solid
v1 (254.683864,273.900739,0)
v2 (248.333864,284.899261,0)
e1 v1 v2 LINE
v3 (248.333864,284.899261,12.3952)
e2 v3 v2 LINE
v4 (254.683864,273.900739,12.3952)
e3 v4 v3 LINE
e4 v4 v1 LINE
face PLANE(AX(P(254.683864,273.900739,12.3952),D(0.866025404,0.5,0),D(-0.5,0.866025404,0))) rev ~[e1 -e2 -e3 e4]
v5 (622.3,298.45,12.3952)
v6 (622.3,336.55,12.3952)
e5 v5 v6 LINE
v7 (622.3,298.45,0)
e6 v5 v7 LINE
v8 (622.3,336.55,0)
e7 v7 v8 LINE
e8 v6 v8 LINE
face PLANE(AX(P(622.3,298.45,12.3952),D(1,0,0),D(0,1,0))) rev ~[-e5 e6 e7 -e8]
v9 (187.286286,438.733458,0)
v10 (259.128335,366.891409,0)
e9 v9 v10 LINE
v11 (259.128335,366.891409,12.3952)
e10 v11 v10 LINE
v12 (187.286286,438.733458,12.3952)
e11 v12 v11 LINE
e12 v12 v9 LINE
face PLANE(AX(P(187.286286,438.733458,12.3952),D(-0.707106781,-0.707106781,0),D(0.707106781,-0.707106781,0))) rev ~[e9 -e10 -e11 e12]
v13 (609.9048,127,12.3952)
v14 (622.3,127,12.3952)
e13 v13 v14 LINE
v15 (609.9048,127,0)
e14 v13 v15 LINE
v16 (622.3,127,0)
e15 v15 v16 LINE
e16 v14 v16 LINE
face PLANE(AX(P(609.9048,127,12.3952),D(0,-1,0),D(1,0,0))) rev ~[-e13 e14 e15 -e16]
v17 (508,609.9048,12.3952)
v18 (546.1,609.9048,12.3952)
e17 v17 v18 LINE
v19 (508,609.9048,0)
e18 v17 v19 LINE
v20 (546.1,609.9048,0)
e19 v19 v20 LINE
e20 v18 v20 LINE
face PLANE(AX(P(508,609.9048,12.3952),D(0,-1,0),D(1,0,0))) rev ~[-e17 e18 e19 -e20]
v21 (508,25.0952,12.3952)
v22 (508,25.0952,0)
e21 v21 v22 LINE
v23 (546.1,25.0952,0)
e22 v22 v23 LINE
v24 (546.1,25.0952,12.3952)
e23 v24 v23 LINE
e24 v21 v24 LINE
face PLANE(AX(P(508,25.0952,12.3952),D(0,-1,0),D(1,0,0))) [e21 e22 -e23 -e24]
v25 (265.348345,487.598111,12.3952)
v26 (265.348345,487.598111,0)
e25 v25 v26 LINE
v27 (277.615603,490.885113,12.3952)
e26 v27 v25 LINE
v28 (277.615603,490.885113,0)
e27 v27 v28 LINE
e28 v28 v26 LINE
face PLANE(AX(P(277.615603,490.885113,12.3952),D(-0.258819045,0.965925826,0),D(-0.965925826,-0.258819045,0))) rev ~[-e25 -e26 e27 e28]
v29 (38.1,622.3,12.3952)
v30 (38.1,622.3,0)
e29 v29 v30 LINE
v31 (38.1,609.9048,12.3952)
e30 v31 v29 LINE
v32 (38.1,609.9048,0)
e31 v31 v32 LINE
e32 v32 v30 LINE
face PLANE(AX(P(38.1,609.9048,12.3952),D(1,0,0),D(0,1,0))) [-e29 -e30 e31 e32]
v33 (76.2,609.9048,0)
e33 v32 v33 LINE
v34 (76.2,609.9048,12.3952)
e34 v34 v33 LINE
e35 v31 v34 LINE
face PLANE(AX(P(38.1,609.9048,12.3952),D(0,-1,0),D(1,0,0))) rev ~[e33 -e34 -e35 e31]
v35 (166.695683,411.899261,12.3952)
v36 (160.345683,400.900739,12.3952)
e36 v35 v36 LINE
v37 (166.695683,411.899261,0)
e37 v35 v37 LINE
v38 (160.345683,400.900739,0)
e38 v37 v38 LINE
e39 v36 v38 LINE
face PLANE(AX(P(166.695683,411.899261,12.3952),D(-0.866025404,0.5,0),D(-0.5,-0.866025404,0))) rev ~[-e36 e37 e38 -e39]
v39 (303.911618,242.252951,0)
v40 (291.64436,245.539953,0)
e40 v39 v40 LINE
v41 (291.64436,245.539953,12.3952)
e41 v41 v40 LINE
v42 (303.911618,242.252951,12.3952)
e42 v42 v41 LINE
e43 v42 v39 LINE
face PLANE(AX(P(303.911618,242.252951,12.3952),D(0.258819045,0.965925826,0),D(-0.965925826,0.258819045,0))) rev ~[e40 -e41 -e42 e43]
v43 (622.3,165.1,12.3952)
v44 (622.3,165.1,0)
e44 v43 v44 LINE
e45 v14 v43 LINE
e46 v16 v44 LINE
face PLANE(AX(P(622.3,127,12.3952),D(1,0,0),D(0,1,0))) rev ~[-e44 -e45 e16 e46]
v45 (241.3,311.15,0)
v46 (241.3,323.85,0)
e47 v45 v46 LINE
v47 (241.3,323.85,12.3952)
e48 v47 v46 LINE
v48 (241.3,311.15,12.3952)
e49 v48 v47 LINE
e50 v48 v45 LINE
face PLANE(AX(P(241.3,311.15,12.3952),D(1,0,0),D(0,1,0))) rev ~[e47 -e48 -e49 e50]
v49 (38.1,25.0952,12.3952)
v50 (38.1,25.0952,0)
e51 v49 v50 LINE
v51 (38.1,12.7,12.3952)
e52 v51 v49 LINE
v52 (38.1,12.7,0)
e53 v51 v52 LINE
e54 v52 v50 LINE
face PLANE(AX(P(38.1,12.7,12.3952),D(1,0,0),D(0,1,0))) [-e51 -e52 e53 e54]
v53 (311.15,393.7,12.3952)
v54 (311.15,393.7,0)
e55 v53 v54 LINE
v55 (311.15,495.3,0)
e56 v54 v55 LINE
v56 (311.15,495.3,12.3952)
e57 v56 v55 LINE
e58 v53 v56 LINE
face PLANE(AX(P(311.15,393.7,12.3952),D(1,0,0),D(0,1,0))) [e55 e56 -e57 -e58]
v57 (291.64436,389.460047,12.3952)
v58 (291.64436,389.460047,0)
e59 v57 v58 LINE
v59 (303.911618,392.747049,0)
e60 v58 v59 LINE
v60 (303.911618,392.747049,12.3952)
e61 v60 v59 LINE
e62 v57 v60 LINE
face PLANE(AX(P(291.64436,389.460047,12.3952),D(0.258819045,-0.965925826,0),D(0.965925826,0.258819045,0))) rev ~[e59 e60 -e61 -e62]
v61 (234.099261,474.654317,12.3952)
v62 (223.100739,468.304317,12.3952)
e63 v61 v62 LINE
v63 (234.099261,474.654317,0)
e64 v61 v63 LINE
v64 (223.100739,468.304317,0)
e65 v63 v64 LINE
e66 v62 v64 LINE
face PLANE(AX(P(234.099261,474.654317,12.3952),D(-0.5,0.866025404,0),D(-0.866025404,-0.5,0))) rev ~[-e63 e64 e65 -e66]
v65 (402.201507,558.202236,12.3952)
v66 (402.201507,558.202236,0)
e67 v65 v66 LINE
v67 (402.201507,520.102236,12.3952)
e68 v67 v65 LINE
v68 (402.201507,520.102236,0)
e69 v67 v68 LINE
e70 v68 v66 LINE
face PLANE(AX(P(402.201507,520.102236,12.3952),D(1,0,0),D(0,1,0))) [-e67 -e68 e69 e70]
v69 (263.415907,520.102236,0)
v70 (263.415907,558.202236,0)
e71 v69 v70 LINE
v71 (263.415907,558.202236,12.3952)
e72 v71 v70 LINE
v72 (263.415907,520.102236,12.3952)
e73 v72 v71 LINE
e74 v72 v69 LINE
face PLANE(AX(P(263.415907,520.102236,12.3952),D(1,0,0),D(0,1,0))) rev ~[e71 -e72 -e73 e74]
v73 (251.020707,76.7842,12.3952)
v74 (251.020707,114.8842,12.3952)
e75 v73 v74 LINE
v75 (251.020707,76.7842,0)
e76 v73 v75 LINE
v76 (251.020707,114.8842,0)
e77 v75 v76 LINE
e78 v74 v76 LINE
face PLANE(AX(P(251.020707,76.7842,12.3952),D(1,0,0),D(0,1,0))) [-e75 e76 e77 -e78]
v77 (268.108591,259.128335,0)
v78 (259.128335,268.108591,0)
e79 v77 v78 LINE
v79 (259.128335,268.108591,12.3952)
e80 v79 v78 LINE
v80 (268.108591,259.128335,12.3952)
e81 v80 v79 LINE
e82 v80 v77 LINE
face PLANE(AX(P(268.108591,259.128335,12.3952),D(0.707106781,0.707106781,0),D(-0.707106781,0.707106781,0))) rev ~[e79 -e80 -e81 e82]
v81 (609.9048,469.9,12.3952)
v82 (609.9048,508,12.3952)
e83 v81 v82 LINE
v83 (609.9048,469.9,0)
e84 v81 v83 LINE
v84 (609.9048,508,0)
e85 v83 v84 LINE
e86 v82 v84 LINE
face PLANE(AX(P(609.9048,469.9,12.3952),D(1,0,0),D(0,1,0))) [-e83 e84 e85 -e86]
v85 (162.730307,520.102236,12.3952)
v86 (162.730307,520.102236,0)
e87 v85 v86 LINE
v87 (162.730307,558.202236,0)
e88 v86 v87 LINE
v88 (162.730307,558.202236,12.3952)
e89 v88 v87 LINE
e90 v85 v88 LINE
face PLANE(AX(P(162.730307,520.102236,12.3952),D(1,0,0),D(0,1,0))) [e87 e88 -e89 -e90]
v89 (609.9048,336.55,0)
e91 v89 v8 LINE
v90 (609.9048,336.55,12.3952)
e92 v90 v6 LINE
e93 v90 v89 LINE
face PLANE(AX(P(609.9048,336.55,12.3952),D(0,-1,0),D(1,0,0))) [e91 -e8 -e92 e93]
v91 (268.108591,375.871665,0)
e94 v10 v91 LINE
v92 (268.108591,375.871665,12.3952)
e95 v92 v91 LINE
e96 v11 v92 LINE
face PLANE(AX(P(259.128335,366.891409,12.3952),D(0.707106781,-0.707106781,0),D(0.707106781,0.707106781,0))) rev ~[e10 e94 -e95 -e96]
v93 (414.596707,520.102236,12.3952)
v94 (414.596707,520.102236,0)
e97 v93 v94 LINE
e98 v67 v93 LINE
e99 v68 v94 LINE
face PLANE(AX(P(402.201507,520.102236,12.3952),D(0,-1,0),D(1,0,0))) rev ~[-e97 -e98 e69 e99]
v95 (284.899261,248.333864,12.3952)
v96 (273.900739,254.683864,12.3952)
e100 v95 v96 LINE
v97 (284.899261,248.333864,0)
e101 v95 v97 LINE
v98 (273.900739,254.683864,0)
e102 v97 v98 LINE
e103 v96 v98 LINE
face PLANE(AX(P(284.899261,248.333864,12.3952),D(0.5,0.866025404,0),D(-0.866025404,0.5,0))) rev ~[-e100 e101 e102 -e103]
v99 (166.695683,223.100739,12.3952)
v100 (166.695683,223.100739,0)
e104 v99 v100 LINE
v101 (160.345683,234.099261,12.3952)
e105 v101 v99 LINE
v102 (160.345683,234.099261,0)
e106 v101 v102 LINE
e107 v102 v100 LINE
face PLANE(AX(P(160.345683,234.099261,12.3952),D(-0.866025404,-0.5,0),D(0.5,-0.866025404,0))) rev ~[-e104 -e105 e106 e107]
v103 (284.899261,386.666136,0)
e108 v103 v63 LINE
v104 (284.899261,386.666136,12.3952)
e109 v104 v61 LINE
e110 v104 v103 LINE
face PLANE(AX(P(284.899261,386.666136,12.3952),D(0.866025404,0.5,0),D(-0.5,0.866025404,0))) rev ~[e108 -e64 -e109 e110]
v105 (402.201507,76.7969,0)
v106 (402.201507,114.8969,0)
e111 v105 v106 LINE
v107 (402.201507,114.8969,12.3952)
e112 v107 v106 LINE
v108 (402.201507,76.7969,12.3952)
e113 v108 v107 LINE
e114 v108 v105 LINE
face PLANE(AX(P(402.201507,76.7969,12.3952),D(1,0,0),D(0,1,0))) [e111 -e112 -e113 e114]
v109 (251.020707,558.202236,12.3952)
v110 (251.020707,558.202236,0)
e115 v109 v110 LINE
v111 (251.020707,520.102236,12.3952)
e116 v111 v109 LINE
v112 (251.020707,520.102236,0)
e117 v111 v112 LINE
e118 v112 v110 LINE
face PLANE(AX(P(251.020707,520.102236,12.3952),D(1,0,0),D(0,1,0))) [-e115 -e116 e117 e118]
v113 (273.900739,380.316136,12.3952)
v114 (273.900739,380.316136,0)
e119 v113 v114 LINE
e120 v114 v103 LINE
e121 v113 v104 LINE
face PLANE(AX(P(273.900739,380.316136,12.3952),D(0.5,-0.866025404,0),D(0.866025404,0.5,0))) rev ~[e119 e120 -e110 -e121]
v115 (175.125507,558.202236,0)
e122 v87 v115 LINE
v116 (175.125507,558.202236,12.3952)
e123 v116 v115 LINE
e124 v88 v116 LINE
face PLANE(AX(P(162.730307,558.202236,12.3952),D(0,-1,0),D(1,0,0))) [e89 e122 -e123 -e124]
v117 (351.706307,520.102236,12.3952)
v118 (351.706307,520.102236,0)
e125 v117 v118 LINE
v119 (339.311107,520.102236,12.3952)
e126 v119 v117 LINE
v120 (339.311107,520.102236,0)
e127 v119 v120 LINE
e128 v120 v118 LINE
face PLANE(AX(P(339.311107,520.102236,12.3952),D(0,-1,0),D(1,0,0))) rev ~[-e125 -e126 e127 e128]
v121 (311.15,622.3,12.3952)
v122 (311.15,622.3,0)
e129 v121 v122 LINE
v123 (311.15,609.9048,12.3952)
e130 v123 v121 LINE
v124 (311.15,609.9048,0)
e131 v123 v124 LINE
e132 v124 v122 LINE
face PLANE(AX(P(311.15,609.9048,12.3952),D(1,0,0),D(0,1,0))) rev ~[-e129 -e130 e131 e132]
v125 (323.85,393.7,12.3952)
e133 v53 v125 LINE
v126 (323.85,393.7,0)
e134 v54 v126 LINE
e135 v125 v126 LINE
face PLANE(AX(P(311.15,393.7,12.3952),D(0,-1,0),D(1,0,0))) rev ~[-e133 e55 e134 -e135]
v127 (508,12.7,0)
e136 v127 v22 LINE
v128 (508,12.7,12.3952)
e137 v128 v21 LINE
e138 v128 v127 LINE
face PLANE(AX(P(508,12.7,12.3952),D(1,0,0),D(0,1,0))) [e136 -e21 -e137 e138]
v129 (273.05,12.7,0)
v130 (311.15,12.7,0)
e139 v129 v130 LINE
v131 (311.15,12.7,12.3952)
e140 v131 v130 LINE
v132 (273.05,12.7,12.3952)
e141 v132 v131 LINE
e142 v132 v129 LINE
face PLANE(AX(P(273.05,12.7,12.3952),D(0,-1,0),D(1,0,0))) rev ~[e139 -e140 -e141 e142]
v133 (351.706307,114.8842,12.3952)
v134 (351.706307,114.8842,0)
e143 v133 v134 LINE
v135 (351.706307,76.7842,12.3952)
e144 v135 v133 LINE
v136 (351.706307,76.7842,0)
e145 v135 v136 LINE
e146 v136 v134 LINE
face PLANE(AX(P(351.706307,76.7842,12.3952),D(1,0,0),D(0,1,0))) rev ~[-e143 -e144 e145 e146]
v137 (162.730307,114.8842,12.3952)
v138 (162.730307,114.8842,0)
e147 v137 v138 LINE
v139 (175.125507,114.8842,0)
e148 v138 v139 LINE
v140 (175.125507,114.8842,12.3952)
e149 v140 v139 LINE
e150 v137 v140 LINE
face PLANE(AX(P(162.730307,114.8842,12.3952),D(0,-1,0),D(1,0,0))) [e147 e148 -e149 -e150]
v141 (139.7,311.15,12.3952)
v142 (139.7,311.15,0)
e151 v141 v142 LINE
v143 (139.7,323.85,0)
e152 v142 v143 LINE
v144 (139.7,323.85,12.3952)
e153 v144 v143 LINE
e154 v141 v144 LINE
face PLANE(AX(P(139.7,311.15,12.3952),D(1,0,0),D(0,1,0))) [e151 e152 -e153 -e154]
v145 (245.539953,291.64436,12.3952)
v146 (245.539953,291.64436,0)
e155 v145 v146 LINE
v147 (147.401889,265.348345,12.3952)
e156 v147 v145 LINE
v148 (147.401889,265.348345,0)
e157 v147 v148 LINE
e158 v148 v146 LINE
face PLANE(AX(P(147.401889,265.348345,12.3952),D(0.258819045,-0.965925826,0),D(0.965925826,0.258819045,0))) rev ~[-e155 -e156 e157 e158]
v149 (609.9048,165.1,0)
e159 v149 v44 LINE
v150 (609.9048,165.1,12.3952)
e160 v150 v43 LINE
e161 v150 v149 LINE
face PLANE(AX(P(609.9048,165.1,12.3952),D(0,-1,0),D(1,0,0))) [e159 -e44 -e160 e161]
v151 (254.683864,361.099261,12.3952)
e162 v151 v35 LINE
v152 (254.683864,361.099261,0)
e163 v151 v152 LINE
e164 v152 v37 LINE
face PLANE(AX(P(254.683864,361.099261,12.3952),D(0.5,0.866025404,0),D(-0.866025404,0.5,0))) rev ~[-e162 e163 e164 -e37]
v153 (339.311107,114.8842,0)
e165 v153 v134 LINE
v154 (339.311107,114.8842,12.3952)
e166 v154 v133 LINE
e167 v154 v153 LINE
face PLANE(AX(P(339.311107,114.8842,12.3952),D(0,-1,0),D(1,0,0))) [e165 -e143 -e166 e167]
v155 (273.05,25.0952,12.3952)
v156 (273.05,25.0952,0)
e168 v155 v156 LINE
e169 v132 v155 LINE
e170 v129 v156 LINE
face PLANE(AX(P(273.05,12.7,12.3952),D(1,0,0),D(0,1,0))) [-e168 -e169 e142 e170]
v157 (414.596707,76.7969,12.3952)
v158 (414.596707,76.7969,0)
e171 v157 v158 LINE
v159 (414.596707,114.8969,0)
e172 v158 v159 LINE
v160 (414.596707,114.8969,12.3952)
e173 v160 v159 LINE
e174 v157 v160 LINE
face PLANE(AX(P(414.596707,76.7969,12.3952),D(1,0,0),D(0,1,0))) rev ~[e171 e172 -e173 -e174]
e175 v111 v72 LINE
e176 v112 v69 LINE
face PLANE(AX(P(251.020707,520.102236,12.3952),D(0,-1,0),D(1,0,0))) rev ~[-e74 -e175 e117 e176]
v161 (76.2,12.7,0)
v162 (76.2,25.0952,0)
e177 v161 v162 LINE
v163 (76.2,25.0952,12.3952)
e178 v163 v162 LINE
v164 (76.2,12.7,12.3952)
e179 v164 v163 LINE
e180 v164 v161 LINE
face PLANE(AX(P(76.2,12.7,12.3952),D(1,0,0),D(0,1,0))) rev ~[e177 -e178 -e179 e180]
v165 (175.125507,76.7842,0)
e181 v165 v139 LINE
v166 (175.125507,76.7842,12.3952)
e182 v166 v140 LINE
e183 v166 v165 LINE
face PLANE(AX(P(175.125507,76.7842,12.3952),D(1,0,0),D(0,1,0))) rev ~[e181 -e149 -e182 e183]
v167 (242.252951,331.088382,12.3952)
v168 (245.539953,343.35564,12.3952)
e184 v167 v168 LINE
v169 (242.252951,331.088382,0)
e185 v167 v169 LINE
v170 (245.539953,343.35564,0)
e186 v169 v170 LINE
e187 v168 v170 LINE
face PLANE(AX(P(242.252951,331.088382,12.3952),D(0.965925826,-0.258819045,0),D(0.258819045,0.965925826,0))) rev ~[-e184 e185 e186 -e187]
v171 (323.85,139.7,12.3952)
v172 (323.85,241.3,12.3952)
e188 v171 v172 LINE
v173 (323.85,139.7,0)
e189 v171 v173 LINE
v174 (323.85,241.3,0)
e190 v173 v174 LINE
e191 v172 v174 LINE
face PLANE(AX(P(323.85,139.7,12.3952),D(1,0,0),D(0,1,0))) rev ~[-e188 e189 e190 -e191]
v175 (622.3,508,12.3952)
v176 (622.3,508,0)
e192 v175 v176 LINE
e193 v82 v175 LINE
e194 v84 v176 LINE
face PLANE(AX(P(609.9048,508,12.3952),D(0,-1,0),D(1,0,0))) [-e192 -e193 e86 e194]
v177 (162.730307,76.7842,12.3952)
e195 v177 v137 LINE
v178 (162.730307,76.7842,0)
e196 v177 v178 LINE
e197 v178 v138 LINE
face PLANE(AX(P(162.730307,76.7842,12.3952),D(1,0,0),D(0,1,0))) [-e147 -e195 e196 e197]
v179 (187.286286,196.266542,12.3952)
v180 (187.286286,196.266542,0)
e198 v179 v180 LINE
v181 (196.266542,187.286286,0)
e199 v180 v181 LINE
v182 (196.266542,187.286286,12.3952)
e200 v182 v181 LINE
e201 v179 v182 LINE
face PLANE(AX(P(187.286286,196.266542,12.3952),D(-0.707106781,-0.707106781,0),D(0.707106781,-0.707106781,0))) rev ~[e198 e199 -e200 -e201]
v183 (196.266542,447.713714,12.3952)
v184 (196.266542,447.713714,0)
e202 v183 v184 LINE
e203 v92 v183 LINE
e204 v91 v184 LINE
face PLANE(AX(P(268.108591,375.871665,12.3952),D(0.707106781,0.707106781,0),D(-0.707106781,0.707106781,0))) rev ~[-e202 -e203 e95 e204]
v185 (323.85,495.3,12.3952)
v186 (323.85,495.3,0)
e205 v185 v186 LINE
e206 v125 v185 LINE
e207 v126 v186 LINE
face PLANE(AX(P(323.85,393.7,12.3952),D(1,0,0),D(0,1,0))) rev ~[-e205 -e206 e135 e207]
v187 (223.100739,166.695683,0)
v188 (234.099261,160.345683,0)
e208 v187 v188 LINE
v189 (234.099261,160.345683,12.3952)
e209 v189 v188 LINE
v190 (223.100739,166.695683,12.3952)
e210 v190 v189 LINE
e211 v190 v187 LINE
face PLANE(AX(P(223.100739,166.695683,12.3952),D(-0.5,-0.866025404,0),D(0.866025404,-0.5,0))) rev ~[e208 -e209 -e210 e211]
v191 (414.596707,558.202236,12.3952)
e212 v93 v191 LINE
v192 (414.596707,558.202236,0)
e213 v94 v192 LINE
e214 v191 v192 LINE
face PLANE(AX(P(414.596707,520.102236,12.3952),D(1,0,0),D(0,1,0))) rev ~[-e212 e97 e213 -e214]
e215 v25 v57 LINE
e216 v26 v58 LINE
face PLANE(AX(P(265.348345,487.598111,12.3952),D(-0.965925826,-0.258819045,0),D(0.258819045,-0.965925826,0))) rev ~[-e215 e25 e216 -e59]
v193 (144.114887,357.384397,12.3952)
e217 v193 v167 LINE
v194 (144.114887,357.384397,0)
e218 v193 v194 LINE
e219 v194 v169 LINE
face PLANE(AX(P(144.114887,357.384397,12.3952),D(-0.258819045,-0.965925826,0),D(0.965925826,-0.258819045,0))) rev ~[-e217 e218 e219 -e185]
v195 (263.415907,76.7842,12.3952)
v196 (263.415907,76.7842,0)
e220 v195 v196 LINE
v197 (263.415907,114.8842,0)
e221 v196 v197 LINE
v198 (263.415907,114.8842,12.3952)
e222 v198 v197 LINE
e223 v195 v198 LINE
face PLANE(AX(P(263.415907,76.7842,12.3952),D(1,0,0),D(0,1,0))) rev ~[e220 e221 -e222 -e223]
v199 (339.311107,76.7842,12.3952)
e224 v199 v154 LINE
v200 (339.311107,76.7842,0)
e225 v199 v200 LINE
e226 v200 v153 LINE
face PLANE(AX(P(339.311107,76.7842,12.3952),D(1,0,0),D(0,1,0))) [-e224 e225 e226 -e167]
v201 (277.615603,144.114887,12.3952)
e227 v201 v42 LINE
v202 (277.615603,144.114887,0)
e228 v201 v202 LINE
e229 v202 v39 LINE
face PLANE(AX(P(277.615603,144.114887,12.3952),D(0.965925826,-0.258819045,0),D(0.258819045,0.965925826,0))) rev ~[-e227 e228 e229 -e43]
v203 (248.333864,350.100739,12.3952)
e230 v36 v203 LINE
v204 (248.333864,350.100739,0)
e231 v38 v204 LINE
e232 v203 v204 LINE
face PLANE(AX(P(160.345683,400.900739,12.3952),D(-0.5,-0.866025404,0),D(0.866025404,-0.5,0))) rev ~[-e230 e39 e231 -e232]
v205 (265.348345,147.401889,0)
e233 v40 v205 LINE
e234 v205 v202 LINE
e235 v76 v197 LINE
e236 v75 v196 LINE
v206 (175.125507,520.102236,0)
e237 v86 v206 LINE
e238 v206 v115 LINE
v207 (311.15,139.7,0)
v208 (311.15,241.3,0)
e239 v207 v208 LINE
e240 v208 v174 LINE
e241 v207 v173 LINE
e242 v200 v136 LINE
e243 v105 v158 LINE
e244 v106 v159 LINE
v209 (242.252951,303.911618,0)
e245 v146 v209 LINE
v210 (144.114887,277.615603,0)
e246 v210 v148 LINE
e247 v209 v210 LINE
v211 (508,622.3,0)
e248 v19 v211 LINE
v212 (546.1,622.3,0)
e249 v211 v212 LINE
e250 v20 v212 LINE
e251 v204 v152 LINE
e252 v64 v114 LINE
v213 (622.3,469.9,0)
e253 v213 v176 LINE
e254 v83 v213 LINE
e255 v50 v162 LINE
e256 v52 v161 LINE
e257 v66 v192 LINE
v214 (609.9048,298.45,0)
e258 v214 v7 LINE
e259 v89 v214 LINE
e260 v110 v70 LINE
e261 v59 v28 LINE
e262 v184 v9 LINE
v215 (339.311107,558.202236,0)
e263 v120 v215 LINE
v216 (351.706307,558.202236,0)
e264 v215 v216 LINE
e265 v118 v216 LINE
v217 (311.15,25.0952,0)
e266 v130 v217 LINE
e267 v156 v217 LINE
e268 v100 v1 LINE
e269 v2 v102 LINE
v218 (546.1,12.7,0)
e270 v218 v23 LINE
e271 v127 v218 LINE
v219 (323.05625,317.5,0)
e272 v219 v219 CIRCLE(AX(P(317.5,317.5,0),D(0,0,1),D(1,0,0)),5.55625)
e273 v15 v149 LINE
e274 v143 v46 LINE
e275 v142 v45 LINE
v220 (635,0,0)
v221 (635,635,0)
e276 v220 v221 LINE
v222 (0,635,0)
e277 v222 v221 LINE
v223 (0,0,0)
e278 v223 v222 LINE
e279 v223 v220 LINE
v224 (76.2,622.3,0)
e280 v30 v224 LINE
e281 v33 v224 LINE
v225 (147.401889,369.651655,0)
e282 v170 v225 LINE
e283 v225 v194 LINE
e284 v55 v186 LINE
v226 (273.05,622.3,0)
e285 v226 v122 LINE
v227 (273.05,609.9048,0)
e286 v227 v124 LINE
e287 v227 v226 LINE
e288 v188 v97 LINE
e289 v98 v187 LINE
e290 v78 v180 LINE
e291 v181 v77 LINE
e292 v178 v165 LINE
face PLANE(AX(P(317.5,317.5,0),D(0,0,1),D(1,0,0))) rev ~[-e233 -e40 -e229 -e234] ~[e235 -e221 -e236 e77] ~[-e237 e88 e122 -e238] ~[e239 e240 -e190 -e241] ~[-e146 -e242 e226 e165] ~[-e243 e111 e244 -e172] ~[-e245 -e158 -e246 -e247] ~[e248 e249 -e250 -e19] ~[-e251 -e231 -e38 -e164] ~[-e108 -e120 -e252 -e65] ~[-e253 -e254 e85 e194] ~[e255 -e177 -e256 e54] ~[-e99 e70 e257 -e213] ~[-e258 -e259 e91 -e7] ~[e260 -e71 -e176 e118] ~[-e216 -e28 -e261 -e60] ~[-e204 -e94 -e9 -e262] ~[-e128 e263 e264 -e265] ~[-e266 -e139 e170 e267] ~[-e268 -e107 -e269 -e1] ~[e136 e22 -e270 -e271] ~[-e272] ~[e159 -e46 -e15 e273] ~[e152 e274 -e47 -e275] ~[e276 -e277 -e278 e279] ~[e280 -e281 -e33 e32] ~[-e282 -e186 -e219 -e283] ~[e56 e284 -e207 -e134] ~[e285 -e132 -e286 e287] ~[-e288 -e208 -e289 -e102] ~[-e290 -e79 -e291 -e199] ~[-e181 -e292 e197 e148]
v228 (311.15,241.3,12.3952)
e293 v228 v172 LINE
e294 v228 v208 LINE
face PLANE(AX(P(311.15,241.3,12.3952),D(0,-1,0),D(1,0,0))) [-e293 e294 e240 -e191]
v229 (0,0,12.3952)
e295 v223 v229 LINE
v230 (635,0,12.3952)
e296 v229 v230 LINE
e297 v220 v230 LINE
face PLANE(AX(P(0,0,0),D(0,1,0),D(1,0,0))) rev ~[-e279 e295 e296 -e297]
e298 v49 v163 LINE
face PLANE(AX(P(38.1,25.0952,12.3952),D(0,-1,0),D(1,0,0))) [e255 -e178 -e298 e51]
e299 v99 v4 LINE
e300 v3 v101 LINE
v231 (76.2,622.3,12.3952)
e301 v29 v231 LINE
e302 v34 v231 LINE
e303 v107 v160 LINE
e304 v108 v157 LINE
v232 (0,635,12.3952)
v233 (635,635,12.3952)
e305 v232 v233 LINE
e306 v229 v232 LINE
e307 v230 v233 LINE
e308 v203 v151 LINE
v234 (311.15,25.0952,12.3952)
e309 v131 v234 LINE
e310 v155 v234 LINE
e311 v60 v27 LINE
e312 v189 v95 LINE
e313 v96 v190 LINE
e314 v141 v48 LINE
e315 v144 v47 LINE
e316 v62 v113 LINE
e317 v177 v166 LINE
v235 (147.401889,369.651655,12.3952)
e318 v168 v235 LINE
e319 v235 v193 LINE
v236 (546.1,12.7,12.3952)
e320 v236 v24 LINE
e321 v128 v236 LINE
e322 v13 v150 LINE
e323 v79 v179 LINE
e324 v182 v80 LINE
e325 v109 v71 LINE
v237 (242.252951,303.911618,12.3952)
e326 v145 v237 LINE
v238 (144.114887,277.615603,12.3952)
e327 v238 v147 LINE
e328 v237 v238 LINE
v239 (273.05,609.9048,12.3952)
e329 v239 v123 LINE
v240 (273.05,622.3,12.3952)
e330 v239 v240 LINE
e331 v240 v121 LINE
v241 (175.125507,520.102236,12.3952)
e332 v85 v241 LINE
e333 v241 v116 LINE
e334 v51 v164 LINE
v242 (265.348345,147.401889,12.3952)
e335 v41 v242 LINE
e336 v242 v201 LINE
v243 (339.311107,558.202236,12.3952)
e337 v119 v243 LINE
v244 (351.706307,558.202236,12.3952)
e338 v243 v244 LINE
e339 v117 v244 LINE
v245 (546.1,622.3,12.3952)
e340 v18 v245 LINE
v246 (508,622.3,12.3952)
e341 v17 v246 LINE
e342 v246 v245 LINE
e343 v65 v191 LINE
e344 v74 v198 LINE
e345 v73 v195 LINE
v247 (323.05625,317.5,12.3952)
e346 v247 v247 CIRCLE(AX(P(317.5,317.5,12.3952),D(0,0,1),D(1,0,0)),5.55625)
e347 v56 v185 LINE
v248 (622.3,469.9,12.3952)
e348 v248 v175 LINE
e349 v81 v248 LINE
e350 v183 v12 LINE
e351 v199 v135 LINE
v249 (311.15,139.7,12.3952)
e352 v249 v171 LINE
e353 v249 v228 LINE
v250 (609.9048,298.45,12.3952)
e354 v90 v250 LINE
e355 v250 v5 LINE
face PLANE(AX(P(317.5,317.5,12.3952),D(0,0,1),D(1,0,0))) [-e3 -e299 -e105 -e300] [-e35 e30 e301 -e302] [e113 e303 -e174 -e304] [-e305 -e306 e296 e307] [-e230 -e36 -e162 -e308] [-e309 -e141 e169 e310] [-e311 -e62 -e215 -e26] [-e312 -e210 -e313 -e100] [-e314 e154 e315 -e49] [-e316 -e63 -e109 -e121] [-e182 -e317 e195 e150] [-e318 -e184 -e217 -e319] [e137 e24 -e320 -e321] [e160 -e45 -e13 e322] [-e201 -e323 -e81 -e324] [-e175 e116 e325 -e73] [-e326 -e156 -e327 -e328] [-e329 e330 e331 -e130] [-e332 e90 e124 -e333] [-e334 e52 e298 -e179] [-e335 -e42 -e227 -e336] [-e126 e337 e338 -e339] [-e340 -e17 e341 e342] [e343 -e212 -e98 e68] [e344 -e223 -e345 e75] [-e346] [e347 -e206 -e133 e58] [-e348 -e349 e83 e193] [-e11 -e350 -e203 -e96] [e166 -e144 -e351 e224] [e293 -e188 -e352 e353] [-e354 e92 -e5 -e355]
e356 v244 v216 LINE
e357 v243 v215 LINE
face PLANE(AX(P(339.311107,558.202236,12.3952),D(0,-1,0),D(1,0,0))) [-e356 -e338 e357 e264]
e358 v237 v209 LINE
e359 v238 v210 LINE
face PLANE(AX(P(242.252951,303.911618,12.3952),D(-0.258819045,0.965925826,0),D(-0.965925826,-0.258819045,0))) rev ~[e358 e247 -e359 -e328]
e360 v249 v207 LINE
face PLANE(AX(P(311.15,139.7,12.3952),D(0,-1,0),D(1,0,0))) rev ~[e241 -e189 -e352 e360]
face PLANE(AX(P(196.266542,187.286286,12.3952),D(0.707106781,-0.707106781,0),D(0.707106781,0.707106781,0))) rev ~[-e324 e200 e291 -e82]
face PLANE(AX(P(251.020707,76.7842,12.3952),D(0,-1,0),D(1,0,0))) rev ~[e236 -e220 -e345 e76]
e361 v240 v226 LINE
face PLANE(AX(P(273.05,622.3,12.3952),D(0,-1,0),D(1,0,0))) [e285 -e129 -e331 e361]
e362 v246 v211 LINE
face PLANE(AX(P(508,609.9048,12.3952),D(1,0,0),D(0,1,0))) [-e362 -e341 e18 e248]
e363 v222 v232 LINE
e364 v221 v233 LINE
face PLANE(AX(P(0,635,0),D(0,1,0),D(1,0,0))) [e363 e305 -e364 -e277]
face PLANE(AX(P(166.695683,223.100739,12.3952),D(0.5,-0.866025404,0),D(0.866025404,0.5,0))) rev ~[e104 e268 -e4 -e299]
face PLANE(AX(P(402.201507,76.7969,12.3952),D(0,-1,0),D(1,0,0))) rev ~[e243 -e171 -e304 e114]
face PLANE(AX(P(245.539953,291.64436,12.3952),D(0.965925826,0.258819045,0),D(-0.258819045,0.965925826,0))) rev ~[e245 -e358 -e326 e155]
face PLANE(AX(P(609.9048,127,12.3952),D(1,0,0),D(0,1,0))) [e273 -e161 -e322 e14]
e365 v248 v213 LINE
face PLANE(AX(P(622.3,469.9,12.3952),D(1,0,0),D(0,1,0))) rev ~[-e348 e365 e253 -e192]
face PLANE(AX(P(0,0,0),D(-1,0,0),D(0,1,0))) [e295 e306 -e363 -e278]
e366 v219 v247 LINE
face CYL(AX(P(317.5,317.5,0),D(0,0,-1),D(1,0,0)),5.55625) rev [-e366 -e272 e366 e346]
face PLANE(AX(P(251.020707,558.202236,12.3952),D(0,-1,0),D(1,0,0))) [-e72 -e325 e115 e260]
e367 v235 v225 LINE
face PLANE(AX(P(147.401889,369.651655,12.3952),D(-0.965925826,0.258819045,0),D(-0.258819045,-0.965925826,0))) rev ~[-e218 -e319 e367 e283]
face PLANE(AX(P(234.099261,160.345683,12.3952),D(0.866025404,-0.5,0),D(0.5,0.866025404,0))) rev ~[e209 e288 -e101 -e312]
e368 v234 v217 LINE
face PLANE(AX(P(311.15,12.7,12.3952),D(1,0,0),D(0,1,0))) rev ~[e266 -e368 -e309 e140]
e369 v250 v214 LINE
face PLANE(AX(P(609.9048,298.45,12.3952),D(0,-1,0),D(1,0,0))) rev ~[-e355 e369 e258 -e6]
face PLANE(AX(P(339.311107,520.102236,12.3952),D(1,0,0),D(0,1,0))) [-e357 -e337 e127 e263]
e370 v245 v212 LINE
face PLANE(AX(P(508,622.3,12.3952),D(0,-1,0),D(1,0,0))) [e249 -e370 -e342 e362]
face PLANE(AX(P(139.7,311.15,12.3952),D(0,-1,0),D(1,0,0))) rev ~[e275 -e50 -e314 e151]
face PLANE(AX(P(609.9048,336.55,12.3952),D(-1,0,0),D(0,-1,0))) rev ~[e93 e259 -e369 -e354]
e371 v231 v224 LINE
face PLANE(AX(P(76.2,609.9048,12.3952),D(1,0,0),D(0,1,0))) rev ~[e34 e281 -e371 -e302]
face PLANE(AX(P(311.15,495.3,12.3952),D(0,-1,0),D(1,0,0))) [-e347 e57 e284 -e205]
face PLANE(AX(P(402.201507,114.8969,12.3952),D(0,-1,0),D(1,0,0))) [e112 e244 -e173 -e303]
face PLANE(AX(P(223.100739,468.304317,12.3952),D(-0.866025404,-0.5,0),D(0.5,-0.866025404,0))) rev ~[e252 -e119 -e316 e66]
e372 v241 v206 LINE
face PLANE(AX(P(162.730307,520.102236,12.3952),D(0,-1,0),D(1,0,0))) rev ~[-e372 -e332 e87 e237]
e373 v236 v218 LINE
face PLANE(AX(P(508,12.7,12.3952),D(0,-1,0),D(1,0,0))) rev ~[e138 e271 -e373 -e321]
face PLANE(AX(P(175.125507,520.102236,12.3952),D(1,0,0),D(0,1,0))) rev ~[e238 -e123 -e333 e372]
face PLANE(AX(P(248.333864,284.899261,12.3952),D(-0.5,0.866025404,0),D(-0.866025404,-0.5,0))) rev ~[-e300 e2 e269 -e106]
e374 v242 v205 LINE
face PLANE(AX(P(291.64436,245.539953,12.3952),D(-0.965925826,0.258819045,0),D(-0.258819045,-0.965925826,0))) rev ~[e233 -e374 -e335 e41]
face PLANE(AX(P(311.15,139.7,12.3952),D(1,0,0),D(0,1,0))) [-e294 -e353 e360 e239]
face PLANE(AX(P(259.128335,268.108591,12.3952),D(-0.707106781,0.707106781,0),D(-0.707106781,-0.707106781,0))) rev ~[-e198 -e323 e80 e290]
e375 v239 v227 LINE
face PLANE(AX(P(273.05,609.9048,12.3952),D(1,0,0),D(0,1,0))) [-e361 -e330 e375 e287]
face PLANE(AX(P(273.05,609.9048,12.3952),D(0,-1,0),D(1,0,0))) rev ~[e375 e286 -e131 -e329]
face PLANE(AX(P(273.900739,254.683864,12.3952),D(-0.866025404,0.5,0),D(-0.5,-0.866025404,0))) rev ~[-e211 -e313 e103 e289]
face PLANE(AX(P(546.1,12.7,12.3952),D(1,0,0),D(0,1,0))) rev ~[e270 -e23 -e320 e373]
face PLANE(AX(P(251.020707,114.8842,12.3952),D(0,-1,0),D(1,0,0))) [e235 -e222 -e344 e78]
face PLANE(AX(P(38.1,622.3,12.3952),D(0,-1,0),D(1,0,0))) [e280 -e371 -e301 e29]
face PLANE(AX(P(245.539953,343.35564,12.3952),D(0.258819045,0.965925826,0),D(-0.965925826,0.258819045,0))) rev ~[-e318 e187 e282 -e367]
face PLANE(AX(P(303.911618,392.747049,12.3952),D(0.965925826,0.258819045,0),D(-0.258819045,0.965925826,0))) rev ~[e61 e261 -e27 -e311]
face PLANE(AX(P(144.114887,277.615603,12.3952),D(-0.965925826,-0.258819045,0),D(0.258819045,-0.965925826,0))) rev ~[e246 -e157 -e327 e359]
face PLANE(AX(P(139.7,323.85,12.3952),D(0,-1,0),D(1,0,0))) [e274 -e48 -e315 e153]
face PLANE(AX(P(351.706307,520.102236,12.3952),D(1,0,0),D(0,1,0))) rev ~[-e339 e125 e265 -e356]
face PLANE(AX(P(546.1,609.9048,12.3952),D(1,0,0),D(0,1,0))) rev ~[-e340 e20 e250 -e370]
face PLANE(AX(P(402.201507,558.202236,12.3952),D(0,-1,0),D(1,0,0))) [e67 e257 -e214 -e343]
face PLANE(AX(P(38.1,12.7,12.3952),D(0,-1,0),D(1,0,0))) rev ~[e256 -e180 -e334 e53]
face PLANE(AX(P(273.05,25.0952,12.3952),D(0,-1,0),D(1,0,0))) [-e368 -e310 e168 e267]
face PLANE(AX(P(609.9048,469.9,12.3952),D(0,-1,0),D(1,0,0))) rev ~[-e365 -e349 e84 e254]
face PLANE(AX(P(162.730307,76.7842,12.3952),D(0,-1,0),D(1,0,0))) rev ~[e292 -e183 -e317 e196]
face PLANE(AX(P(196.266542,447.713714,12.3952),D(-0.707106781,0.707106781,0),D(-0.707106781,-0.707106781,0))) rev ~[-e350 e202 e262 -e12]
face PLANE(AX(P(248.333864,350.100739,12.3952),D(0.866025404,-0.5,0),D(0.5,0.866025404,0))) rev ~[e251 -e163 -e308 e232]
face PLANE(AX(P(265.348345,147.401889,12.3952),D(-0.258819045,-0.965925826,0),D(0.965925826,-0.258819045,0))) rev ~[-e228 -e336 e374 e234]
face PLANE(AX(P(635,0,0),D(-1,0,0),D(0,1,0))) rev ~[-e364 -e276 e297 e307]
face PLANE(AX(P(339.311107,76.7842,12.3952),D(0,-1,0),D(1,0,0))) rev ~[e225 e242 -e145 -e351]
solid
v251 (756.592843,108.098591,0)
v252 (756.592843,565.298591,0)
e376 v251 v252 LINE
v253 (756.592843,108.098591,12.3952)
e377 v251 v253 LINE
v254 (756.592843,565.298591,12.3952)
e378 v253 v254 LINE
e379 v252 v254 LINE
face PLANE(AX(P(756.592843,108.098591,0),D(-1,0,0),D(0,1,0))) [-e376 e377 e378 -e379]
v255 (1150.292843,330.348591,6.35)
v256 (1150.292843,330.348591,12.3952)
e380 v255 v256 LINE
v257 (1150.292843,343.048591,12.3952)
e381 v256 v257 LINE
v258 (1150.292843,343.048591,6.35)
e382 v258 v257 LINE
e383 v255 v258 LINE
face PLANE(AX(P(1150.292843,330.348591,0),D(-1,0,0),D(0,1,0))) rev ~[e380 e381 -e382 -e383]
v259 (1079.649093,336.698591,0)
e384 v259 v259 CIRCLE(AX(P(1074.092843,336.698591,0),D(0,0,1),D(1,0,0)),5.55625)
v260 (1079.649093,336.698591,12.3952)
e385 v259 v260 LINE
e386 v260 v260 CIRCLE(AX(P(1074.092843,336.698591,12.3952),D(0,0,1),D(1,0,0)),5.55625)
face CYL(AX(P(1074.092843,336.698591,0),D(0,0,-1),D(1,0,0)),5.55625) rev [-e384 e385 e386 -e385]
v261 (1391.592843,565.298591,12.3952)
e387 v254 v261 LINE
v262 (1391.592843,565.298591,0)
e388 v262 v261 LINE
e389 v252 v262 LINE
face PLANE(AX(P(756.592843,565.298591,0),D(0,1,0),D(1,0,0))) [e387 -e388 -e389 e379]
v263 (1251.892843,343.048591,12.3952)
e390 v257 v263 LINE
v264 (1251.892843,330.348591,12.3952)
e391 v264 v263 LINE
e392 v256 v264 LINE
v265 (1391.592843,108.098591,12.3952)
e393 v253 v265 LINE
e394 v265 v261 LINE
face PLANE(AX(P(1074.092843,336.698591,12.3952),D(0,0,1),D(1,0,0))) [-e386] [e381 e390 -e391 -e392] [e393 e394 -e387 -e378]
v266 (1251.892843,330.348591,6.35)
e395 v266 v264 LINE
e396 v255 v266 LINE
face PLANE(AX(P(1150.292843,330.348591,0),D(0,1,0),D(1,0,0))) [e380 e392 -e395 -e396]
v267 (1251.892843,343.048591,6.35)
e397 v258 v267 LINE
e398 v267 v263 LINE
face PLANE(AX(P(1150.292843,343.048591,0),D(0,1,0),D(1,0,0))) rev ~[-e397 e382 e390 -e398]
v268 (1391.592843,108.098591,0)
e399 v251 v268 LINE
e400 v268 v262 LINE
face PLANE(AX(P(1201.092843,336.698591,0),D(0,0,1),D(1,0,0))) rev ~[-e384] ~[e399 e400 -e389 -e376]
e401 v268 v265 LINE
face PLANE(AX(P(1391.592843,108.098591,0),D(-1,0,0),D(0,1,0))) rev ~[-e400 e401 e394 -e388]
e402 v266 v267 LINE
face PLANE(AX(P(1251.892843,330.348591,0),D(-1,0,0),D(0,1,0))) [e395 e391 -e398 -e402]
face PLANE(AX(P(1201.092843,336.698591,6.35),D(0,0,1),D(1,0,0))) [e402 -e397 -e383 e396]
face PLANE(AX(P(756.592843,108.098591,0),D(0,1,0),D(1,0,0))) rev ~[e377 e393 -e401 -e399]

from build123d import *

# Parameters (mm, degrees)
F0_W     = 635
F0_H     = 635
F0_R     = 5.55625
F1_DEPTH = 12.3952
F0_H_2   = 457.2
F0_W_2   = 101.6
F0_H_3   = 12.7
F2_W     = 38.1
F2_H     = 12.3952
F2_W_2   = 12.3952
F2_H_2   = 38.1
F2_H_3   = 19.05
F3_DEPTH = 12.3952
F4_DEPTH = 6.35
F5_W     = 12.7
F5_H     = 101.6
F5_W_2   = 101.6
F5_H_2   = 12.7
F6_DEPTH = 12.3952


# Not quite as in the source:
# - a feature names something its author has since deleted; it is built from what else it names


with BuildPart() as f1:
    # F0 (on Top) → F1 (new body)
    with BuildSketch(Plane.XY):
        with Locations((317.5, 317.5)):
            Rectangle(F0_W, F0_H)
        with Locations((317.5, 317.5)):
            Circle(F0_R, mode=Mode.SUBTRACT)
    extrude(amount=F1_DEPTH)

    # F2 (on face) → F3 (cut)
    with BuildSketch(Plane.XY.offset(12.3952)):
        with Locations((57.15, 616.1024)):
            Rectangle(F2_W, F2_H)
        with Locations((292.1, 616.1024)):
            Rectangle(F2_W, F2_H)
        with Locations((527.05, 616.1024)):
            Rectangle(F2_W, F2_H)
        with Locations((57.15, 18.8976)):
            Rectangle(F2_W, F2_H)
        with Locations((292.1, 18.8976)):
            Rectangle(F2_W, F2_H)
        with Locations((527.05, 18.8976)):
            Rectangle(F2_W, F2_H)
        with Locations((616.1024, 488.95)):
            Rectangle(F2_W_2, F2_H_2)
        with Locations((616.1024, 327.025)):
            Rectangle(F2_W_2, F2_H_3)
        with Locations((616.1024, 146.05)):
            Rectangle(F2_W_2, F2_H_2)
        with Locations((408.399107, 95.8469)):
            Rectangle(F2_W_2, F2_H_2)
        with Locations((345.508707, 95.8342)):
            Rectangle(F2_W_2, F2_H_2)
        with Locations((168.927907, 95.8342)):
            Rectangle(F2_W_2, F2_H_2)
        with Locations((257.218307, 95.8342)):
            Rectangle(F2_W_2, F2_H_2)
        with Locations((168.927907, 539.1522364)):
            Rectangle(F2_W_2, F2_H_2)
        with Locations((257.218307, 539.1522364)):
            Rectangle(F2_W_2, F2_H_2)
        with Locations((345.508707, 539.1522364)):
            Rectangle(F2_W_2, F2_H_2)
        with Locations((408.399107, 539.1522364)):
            Rectangle(F2_W_2, F2_H_2)
        with Locations((616.1024, 307.975)):
            Rectangle(F2_W_2, F2_H_3)
    extrude(amount=-F3_DEPTH, mode=Mode.SUBTRACT)

    # F5 (on face) → F6 (cut, through all)
    with BuildSketch(Plane.XY.offset(12.3952)):
        with Locations((317.5, 444.5)):
            Rectangle(F5_W, F5_H)
        Polygon((303.9116177601, 392.7470488996), (277.6156027777, 490.8851128506), (265.3483447838, 487.5981109778), (291.6443597663, 389.4600470268), align=None)
        Polygon((284.899261314, 386.6661357684), (234.099261314, 474.6543167929), (223.100738686, 468.3043167929), (273.900738686, 380.3161357684), align=None)
        Polygon((259.1283352131, 366.8914086659), (268.1085913341, 375.8716647869), (196.2665423656, 447.7137137555), (187.2862862445, 438.7334576344), align=None)
        Polygon((248.3338642316, 350.100738686), (254.6838642316, 361.099261314), (166.6956832071, 411.899261314), (160.3456832071, 400.900738686), align=None)
        Polygon((242.2529511004, 331.0883822399), (245.5399529732, 343.3556402337), (147.4018890222, 369.6516552162), (144.1148871494, 357.3843972223), align=None)
        with Locations((190.5, 317.5)):
            Rectangle(F5_W_2, F5_H_2)
        Polygon((245.5399529732, 291.6443597663), (242.2529511004, 303.9116177601), (144.1148871494, 277.6156027777), (147.4018890222, 265.3483447838), align=None)
        Polygon((254.6838642316, 273.900738686), (248.3338642316, 284.899261314), (160.3456832071, 234.099261314), (166.6956832071, 223.100738686), align=None)
        Polygon((268.1085913341, 259.1283352131), (259.1283352131, 268.1085913341), (187.2862862445, 196.2665423656), (196.2665423656, 187.2862862445), align=None)
        Polygon((284.899261314, 248.3338642316), (273.900738686, 254.6838642316), (223.100738686, 166.6956832071), (234.099261314, 160.3456832071), align=None)
        Polygon((303.9116177601, 242.2529511004), (291.6443597663, 245.5399529732), (265.3483447838, 147.4018890222), (277.6156027777, 144.1148871494), align=None)
        with Locations((317.5, 190.5)):
            Rectangle(F5_W, F5_H)
    extrude(amount=-F6_DEPTH, mode=Mode.SUBTRACT)


with BuildPart() as f1b:
    # F0 (on Top) → F1, piece 2 (new body)
    with BuildSketch(Plane.XY):
        with Locations((1074.0928434372, 336.6985905102)):
            Rectangle(F0_W, F0_H_2)
        with Locations((1074.0928434372, 336.6985905102)):
            Circle(F0_R, mode=Mode.SUBTRACT)
        with Locations((1201.0928434372, 336.6985905102)):
            Rectangle(F0_W_2, F0_H_3, mode=Mode.SUBTRACT)
    extrude(amount=F1_DEPTH)

    # F0 (on Top) → F4 (join)
    with BuildSketch(Plane.XY):
        with Locations((1201.0928434372, 336.6985905102)):
            Rectangle(F0_W_2, F0_H_3)
    extrude(amount=F4_DEPTH)


solid = Compound([f1.part, f1b.part])
